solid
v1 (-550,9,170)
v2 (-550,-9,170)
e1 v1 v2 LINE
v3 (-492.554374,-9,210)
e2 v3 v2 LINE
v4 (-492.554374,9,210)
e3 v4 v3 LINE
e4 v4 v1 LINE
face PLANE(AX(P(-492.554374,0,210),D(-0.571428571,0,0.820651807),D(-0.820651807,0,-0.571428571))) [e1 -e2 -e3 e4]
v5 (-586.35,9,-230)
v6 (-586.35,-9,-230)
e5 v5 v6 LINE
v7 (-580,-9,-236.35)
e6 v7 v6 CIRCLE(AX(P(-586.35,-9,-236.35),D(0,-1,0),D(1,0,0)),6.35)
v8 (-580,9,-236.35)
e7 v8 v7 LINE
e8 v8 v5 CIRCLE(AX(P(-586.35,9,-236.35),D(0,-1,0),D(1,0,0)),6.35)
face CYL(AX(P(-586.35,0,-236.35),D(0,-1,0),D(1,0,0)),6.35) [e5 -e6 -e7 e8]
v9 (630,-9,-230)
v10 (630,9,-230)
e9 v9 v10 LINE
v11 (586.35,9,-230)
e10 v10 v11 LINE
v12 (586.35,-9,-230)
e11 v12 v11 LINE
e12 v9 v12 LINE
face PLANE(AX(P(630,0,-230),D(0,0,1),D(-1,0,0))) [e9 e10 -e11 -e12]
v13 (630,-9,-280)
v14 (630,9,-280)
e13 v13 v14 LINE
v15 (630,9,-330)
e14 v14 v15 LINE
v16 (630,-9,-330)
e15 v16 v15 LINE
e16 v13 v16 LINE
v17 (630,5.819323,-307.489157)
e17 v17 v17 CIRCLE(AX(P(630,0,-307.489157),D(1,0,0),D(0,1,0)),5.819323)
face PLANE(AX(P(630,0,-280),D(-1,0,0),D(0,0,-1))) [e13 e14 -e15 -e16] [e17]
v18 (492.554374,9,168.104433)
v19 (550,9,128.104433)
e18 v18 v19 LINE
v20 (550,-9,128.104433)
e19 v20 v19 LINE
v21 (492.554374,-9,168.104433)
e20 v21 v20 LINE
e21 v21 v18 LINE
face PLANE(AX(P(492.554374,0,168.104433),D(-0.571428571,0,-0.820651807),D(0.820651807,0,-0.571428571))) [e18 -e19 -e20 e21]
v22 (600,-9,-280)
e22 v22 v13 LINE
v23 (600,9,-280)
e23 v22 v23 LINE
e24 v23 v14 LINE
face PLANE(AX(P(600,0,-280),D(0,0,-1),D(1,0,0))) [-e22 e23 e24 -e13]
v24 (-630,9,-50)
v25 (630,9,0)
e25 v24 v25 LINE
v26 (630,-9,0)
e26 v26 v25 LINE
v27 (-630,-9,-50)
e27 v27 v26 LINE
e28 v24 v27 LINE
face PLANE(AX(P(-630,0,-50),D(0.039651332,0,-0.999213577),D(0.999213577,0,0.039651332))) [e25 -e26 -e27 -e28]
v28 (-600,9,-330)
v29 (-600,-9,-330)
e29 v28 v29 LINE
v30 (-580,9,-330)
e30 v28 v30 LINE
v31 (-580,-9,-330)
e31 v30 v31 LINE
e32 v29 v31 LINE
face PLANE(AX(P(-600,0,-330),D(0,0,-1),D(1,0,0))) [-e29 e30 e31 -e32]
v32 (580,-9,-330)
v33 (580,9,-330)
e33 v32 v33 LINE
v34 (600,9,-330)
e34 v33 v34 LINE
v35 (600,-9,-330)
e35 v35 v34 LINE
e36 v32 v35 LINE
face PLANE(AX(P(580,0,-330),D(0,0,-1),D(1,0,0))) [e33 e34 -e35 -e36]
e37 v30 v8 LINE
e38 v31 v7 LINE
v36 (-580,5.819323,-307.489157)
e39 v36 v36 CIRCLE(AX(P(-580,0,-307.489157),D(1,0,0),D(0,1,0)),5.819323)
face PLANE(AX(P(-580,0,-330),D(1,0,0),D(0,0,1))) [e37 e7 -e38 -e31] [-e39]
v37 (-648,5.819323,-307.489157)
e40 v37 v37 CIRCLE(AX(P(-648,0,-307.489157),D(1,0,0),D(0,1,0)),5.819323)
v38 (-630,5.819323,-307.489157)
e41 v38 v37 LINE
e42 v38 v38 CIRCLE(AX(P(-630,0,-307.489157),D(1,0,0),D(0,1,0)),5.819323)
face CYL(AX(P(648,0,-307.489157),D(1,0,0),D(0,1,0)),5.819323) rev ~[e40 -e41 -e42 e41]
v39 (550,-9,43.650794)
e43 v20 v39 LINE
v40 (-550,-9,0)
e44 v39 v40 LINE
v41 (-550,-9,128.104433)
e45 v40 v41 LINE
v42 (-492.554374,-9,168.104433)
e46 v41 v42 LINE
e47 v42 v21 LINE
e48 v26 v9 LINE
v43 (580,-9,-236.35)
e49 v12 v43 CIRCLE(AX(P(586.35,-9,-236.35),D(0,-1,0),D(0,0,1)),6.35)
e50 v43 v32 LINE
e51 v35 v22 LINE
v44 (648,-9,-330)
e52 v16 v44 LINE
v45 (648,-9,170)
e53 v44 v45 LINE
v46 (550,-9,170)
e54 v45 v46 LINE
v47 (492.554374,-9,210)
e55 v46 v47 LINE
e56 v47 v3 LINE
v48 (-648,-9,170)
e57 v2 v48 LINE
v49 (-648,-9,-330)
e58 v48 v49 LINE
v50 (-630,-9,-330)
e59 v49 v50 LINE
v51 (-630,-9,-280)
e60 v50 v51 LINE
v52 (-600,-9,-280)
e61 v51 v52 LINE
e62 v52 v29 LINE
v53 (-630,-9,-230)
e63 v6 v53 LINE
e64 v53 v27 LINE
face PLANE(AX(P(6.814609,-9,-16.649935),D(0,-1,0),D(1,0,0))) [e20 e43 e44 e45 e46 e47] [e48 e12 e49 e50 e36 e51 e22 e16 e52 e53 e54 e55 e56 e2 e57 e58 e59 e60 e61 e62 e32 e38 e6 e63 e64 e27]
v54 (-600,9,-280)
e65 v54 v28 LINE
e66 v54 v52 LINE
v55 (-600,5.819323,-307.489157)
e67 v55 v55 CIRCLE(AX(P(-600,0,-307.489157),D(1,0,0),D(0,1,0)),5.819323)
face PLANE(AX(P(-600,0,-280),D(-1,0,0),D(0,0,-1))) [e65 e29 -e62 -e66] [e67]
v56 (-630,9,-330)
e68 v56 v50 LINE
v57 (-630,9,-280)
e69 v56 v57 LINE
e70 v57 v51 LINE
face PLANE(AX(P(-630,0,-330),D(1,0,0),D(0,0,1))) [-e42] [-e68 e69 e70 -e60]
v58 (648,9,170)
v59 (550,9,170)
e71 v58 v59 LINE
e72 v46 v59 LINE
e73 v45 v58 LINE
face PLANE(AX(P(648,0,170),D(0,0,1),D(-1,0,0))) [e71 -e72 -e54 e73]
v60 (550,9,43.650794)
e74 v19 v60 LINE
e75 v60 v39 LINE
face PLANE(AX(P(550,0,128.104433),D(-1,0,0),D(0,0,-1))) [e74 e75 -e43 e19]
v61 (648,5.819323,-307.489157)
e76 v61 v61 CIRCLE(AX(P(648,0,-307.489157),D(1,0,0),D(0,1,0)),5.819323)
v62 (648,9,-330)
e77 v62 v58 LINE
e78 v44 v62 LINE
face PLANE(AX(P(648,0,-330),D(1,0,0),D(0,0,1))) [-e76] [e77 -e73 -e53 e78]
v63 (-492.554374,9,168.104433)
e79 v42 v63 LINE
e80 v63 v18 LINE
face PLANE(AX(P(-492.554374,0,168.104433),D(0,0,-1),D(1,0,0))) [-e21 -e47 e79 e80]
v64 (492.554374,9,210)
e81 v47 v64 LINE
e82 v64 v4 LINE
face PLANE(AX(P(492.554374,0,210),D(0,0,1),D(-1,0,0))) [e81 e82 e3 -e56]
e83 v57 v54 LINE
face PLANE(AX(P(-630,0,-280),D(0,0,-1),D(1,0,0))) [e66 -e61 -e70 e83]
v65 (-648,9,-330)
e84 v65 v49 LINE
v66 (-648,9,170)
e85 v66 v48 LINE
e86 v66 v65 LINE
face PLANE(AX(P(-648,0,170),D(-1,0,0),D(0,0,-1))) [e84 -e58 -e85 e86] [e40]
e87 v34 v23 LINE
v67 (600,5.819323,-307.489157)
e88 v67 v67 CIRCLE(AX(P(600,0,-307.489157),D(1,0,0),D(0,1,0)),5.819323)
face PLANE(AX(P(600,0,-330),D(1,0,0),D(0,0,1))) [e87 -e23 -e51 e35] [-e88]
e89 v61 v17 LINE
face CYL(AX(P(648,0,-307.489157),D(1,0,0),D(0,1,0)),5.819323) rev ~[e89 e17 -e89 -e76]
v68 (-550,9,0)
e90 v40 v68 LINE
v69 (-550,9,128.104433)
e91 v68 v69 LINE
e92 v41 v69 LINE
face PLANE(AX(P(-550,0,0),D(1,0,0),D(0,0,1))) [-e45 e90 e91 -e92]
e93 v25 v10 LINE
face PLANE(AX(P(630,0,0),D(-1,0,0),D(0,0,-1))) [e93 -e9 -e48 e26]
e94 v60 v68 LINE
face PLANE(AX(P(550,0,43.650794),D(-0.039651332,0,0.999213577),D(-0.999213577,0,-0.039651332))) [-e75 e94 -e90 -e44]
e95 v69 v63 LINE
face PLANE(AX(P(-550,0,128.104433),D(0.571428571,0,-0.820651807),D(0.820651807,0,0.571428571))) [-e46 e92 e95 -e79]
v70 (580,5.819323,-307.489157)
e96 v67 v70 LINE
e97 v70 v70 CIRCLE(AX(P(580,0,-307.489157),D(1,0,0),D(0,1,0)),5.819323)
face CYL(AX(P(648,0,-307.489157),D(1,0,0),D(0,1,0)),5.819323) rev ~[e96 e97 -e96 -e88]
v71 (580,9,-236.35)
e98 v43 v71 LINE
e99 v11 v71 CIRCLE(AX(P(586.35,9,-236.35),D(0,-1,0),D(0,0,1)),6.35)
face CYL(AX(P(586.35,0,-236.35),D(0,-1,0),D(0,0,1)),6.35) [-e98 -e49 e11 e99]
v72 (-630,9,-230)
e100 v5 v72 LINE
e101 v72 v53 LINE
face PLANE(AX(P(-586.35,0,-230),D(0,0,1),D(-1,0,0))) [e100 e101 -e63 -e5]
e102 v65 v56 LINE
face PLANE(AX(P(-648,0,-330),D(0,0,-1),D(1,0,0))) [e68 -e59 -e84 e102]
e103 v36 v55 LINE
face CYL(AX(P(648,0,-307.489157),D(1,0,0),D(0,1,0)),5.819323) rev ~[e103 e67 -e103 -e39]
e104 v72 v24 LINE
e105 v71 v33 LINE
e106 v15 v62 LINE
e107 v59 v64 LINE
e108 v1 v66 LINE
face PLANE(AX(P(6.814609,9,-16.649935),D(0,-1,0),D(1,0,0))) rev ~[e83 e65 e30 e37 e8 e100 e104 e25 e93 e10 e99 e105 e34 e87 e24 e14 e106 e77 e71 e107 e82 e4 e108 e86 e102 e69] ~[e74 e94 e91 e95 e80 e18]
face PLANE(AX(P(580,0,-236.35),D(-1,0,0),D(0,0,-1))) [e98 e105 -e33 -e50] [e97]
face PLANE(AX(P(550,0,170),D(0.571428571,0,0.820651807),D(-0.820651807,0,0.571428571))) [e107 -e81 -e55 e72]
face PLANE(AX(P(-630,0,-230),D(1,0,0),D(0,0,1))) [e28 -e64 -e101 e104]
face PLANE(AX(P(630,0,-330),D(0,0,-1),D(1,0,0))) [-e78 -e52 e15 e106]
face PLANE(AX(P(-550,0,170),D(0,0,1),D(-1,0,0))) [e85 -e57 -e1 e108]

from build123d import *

# Parameters (mm, degrees)
F1_DEPTH = 9
F2_R     = 5.8193233161
F3_DEPTH = 1800


# Not quite as in the source:
# - a feature names something its author has since deleted; it is built from what else it names


with BuildPart() as f1:
    # F0 (on Front) → F1 (new body, symmetric)
    with BuildSketch(Plane.XZ):
        with BuildLine():
            Line((492.5543735346, 210), (0, 210))
            Line((0, 210), (-492.5543735346, 210))
            Line((-492.5543735346, 210), (-550, 170))
            Line((-550, 170), (-630, 170))
            Line((-630, 170), (-648, 170))
            Line((-648, 170), (-648, -230))
            Line((-648, -230), (-648, -330))
            Line((-648, -330), (-630, -330))
            Line((-630, -330), (-630, -280))
            Line((-630, -280), (-600, -280))
            Line((-600, -280), (-600, -330))
            Line((-600, -330), (-580, -330))
            Line((-580, -330), (-580, -236.35))
            ThreePointArc((-580, -236.35), (-581.8598719395, -231.8598719395), (-586.35, -230))
            Line((-586.35, -230), (-630, -230))
            Line((-630, -230), (-630, -50))
            Line((-630, -50), (630, 0))
            Line((630, 0), (630, -50))
            Line((630, -50), (630, -230))
            Line((630, -230), (586.35, -230))
            ThreePointArc((586.35, -230), (581.8598719395, -231.8598719395), (580, -236.35))
            Line((580, -236.35), (580, -330))
            Line((580, -330), (600, -330))
            Line((600, -330), (600, -280))
            Line((600, -280), (630, -280))
            Line((630, -280), (630, -330))
            Line((630, -330), (648, -330))
            Line((648, -330), (648, -230))
            Line((648, -230), (648, 170))
            Line((648, 170), (630, 170))
            Line((630, 170), (550, 170))
            Line((550, 170), (492.5543735346, 210))
        make_face()
        Polygon((550, 43.6507936508), (-550, 0), (-550, 128.1044334173), (-492.5543735346, 168.1044334173), (492.5543735346, 168.1044334173), (550, 128.1044334173), align=None, mode=Mode.SUBTRACT)
    extrude(amount=F1_DEPTH, both=True)

    # F2 (on face) → F3 (cut)
    with BuildSketch(Plane.YZ.offset(648)):
        with Locations((0, -307.489156723)):
            Circle(F2_R)
    extrude(amount=-F3_DEPTH, mode=Mode.SUBTRACT)


solid = f1.part
